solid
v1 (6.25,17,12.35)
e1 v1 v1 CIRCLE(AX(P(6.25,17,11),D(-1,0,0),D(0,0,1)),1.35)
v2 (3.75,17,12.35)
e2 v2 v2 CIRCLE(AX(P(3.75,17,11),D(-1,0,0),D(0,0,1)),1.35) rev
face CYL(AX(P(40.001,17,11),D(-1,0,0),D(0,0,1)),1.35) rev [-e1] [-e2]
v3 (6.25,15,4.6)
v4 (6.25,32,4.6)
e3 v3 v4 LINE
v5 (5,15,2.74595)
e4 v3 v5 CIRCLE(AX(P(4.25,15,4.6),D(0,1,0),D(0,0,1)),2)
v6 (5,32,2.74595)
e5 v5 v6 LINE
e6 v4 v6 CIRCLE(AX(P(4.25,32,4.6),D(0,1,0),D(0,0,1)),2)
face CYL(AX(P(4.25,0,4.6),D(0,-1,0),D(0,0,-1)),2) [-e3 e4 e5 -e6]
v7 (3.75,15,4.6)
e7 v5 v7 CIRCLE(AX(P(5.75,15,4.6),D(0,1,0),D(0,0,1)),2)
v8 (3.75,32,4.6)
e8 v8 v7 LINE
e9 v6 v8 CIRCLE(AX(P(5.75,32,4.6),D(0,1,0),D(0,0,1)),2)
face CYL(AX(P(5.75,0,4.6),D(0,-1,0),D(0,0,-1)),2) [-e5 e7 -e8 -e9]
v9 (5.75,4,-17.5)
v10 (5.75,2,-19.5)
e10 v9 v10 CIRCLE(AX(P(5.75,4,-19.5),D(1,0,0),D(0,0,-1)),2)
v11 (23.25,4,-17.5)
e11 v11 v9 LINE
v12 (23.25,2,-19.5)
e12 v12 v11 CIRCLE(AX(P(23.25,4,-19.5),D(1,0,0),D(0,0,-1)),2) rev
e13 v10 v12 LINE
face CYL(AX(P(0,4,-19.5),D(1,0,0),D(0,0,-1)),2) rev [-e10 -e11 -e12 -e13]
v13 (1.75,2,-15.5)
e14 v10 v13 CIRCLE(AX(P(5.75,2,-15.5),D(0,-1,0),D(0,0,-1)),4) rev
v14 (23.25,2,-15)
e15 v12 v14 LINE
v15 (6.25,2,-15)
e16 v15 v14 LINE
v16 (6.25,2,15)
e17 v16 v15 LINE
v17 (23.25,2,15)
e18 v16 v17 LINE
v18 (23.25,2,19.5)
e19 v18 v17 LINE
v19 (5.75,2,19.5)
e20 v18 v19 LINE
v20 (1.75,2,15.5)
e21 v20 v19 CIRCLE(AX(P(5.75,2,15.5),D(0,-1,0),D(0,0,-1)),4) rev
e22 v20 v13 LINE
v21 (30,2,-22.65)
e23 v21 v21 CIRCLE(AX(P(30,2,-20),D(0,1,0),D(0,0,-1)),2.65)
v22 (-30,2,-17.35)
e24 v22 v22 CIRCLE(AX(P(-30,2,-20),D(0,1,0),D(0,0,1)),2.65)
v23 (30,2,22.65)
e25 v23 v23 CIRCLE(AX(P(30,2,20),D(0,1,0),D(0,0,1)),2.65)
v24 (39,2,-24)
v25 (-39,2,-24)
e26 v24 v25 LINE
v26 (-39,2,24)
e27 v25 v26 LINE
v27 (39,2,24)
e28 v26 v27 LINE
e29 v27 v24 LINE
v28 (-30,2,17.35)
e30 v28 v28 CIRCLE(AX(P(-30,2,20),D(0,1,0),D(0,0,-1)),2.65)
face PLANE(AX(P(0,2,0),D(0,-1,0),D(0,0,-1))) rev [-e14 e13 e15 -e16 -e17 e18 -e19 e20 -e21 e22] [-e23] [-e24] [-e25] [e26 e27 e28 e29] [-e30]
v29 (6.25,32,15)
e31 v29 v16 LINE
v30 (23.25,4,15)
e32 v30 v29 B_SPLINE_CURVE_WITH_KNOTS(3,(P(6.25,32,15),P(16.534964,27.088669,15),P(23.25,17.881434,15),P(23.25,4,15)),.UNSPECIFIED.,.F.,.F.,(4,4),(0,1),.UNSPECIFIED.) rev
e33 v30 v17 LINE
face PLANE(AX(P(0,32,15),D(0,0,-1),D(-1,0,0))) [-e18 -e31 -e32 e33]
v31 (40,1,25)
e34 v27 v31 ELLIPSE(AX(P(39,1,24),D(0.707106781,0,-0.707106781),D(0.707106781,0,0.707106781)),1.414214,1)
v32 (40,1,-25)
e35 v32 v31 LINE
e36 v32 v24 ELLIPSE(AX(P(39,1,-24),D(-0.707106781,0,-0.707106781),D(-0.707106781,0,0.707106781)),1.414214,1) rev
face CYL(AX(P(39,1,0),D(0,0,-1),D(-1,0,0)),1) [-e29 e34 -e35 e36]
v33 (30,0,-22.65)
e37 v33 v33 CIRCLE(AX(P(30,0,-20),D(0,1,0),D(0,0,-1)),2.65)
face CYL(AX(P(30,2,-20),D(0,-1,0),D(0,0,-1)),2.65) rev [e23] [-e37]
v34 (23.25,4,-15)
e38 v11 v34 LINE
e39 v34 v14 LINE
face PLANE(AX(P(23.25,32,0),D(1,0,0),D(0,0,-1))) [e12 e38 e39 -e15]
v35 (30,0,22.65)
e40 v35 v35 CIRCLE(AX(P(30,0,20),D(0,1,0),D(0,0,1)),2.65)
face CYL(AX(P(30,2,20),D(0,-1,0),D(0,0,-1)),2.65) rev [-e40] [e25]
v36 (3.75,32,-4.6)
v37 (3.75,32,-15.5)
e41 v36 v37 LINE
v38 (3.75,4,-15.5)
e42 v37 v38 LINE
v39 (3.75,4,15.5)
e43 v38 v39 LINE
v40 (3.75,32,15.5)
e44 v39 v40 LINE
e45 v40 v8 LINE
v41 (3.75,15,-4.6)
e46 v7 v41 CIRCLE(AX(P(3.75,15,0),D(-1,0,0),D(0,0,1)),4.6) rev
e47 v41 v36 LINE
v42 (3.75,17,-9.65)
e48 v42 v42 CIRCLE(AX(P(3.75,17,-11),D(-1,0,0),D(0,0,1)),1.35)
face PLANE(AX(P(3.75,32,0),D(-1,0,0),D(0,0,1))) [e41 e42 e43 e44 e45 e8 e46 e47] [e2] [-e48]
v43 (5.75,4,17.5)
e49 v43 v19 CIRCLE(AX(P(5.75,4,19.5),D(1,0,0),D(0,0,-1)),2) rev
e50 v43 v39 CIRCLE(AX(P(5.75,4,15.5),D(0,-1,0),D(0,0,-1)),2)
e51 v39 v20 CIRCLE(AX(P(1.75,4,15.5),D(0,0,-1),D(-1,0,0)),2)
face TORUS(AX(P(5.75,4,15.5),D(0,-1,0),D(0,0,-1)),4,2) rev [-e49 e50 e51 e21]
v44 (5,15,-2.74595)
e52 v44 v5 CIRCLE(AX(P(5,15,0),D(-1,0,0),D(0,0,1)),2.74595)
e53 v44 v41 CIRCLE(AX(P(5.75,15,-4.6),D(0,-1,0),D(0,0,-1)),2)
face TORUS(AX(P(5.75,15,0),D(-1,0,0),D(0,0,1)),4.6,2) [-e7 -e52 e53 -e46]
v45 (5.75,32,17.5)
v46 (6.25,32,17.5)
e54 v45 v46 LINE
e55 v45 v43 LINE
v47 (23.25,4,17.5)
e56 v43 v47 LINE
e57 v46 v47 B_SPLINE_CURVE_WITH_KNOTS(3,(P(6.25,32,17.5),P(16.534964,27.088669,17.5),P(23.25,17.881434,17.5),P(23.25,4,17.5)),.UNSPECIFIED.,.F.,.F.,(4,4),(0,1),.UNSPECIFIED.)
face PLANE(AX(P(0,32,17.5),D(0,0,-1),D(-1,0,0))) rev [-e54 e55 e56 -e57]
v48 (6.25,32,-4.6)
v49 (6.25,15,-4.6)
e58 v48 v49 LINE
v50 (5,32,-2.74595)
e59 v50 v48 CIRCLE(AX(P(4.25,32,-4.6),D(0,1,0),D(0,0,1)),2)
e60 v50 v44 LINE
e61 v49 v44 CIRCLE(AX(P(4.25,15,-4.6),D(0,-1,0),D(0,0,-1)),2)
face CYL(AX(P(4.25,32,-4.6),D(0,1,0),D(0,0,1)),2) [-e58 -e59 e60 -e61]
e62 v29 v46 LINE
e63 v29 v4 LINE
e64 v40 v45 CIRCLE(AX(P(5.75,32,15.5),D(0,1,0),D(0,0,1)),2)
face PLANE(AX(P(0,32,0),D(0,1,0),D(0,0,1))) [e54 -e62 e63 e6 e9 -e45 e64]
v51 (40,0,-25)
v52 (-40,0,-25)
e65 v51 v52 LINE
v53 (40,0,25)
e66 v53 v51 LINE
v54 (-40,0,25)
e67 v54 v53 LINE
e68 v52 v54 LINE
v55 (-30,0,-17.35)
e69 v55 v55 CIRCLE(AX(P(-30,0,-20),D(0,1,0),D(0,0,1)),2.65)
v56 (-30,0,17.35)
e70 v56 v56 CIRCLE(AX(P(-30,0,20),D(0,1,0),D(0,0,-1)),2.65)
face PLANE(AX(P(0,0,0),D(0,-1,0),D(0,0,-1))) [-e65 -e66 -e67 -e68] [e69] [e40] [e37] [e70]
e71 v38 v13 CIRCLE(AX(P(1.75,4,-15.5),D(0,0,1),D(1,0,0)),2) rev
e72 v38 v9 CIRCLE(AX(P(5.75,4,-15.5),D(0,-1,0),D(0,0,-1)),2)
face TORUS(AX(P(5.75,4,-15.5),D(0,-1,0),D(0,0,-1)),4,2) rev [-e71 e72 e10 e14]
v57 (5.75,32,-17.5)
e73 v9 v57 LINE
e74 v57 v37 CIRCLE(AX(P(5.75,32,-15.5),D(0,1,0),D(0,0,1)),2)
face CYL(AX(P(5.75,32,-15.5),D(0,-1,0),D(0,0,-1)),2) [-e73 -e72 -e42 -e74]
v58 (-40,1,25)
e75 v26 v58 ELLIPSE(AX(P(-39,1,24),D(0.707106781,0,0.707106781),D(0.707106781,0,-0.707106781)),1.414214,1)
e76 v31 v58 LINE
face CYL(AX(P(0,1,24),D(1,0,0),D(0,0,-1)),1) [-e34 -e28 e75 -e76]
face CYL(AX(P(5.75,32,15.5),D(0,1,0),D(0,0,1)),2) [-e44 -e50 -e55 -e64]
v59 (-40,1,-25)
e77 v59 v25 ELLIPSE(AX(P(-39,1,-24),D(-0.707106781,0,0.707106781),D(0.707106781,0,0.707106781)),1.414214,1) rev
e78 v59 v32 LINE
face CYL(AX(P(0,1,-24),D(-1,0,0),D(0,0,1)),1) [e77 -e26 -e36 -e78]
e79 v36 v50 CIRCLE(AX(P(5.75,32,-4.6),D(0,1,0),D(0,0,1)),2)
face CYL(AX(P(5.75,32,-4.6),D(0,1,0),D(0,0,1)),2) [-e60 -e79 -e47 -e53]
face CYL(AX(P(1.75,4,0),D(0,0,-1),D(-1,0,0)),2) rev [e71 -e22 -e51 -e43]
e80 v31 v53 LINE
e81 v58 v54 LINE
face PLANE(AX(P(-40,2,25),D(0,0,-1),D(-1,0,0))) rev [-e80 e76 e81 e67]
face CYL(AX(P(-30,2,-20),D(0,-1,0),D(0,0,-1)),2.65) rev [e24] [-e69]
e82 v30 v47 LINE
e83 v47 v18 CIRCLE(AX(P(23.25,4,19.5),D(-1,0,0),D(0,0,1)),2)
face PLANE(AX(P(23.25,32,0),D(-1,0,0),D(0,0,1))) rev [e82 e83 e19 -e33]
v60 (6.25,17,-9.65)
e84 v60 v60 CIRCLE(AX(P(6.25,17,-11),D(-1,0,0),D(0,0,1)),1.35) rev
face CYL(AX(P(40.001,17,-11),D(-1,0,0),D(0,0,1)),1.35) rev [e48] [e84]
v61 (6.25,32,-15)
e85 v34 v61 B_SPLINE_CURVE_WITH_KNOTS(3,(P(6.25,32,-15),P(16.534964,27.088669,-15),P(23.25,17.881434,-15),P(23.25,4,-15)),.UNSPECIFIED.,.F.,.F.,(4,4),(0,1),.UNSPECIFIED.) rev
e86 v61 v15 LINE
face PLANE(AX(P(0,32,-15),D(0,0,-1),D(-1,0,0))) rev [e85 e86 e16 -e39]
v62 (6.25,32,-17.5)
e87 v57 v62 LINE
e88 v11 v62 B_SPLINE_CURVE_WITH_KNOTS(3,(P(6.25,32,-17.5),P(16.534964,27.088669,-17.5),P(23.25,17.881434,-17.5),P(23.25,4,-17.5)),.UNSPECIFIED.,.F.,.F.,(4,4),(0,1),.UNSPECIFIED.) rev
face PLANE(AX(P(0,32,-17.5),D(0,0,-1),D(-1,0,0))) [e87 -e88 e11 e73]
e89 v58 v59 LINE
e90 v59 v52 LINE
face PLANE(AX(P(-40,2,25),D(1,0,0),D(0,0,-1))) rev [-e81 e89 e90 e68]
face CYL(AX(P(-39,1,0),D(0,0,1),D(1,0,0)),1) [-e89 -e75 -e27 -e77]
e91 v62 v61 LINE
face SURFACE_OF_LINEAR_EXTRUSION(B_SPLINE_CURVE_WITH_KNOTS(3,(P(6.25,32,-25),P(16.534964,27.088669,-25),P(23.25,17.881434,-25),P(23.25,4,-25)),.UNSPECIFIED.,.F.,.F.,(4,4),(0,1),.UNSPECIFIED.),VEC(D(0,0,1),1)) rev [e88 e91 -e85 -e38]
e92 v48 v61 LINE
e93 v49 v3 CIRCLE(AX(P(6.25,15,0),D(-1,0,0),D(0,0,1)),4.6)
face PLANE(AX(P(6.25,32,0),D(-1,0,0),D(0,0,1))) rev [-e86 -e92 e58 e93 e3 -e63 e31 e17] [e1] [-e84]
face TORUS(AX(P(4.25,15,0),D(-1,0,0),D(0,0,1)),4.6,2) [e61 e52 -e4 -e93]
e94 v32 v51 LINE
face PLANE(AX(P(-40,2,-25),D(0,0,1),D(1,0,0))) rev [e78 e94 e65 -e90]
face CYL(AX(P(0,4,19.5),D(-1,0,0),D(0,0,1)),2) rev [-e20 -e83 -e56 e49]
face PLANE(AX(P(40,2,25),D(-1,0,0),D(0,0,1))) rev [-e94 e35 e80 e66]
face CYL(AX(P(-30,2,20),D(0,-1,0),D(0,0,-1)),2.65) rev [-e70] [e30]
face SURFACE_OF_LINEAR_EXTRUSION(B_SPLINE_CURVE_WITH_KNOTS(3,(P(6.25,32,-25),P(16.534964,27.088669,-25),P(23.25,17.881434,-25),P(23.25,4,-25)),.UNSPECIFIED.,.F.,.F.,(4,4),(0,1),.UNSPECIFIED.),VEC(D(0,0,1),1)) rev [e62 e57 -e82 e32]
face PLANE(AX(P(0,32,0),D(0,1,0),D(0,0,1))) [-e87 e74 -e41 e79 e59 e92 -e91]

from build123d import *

# Parameters (mm, degrees)
SKETCH_2_W          = 80
SKETCH_2_H          = 50
SKETCH_2_R          = 2.65
EXTRUDE_1_DEPTH     = 2
SKETCH_3_W          = 2.5
SKETCH_3_H          = 35
SKETCH_3_W_2        = 17
SKETCH_3_H_2        = 2.5
EXTRUDE_2_DEPTH     = 30
CUT_EXTRUDE_1_REACH = 61.691
SKETCH_4_R          = 1.35
SKETCH_4_W          = 5.2
SKETCH_4_H          = 17
FILLET_1_R          = 2
FILLET_2_R          = 1
CUT_EXTRUDE_2_DEPTH = 67.560123197


with BuildPart() as part:
    # 草图2 → 凸台-拉伸1 (new body)
    with BuildSketch(Plane(origin=(0, 0, 0), x_dir=(1, 0, 0), z_dir=(0, 1, 0))):
        Rectangle(SKETCH_2_W, SKETCH_2_H)
        with Locations(Location((-30, 20, 0), (0, 0, 270))):
            Circle(SKETCH_2_R, mode=Mode.SUBTRACT)
        with Locations(Location((30, 20, 0), (0, 0, 90))):
            Circle(SKETCH_2_R, mode=Mode.SUBTRACT)
        with Locations(Location((-30, -20, 0), (0, 0, 90))):
            Circle(SKETCH_2_R, mode=Mode.SUBTRACT)
        with Locations(Location((30, -20, 0), (0, 0, 270))):
            Circle(SKETCH_2_R, mode=Mode.SUBTRACT)
    extrude(amount=EXTRUDE_1_DEPTH)

    # 草图3 → 凸台-拉伸2 (add)
    with BuildSketch(Plane(origin=(0, 2, 0), x_dir=(1, 0, 0), z_dir=(0, 1, 0))):
        with Locations((5, 0)):
            Rectangle(SKETCH_3_W, SKETCH_3_H)
        with Locations((14.75, 16.25)):
            Rectangle(SKETCH_3_W_2, SKETCH_3_H_2)
        with Locations((14.75, -16.25)):
            Rectangle(SKETCH_3_W_2, SKETCH_3_H_2)
    extrude(amount=EXTRUDE_2_DEPTH)

    # 草图4 → 切除-拉伸1 (cut, up to next)
    with BuildSketch(Plane.ZY.offset(-3.75), mode=Mode.PRIVATE) as cut_extrude_1_sk1:
        with Locations((11, 17)):
            Circle(SKETCH_4_R)
    cut_extrude_1_tool1 = extrude(cut_extrude_1_sk1.sketch, amount=-CUT_EXTRUDE_1_REACH, mode=Mode.PRIVATE) & part.part
    # 草图4 → 切除-拉伸1 (cut, up to next)
    with BuildSketch(Plane.ZY.offset(-3.75), mode=Mode.PRIVATE) as cut_extrude_1_sk2:
        with Locations((-11, 17)):
            Circle(SKETCH_4_R)
    cut_extrude_1_tool2 = extrude(cut_extrude_1_sk2.sketch, amount=-CUT_EXTRUDE_1_REACH, mode=Mode.PRIVATE) & part.part
    # 草图4 → 切除-拉伸1 (cut, up to next)
    with BuildSketch(Plane.ZY.offset(-3.75), mode=Mode.PRIVATE) as cut_extrude_1_sk3:
        with Locations((0, 23.5)):
            Rectangle(SKETCH_4_W, SKETCH_4_H)
    cut_extrude_1_tool3 = extrude(cut_extrude_1_sk3.sketch, amount=-CUT_EXTRUDE_1_REACH, mode=Mode.PRIVATE) & part.part
    # 草图4 → 切除-拉伸1 (cut, up to next)
    with BuildSketch(Plane.ZY.offset(-3.75), mode=Mode.PRIVATE) as cut_extrude_1_sk4:
        with BuildLine():
            Line((-2.6, 15), (2.6, 15))
            ThreePointArc((2.6, 15), (0, 12.4), (-2.6, 15))
        make_face()
    cut_extrude_1_tool4 = extrude(cut_extrude_1_sk4.sketch, amount=-CUT_EXTRUDE_1_REACH, mode=Mode.PRIVATE) & part.part
    add(cut_extrude_1_tool1.solids().sort_by_distance((3.75, 17, 11))[0], mode=Mode.SUBTRACT)
    add(cut_extrude_1_tool2.solids().sort_by_distance((3.75, 17, -11))[0], mode=Mode.SUBTRACT)
    add(cut_extrude_1_tool3.solids().sort_by_distance((3.75, 23.5, 0))[0], mode=Mode.SUBTRACT)
    add(cut_extrude_1_tool4.solids().sort_by_distance((3.75, 13.896526, 0))[0], mode=Mode.SUBTRACT)

    # 圆角1
    # the kernel refuses this fillet: 2 mm, written as the material it takes off along each edge
    with BuildSketch(Plane(origin=(6.25, 37, 2.6), x_dir=(0, 0, 1), z_dir=(0, -1, 0)), Plane(origin=(6.25, 15, -2.6), x_dir=(0, 0, -1), z_dir=(0, 1, 0)), Plane(origin=(3.75, 37, -2.6), x_dir=(0, 0, -1), z_dir=(0, -1, 0)), Plane(origin=(3.75, 15, 2.6), x_dir=(0, 0, 1), z_dir=(0, 1, 0))) as fillet_1_piece_1:
        with BuildLine():
            CenterArc((FILLET_1_R, FILLET_1_R), FILLET_1_R, 180, 90)
            Line((0, FILLET_1_R), (0, 0))
            Line((0, 0), (FILLET_1_R, 0))
        make_face()
    extrude(amount=22, mode=Mode.SUBTRACT)
    with BuildSketch(Plane(origin=(6.25, 15, 0), x_dir=(0, 0, -1), z_dir=(0, 1, 0))) as fillet_1_piece_2:
        with BuildLine():
            CenterArc((2.6 + FILLET_1_R, FILLET_1_R), FILLET_1_R, 180, 90)
            Line((2.6, FILLET_1_R), (2.6, 0))
            Line((2.6, 0), (2.6 + FILLET_1_R, 0))
        make_face()
    revolve(axis=Axis((6.25, 15, 0), (-1, 0, 0)), revolution_arc=180, mode=Mode.SUBTRACT)
    with BuildSketch(Plane(origin=(3.75, 15, 0), x_dir=(0, 0, 1), z_dir=(0, 1, 0))) as fillet_1_piece_3:
        with BuildLine():
            CenterArc((2.6 + FILLET_1_R, FILLET_1_R), FILLET_1_R, 180, 90)
            Line((2.6, FILLET_1_R), (2.6, 0))
            Line((2.6, 0), (2.6 + FILLET_1_R, 0))
        make_face()
    revolve(axis=Axis((3.75, 15, 0), (1, 0, 0)), revolution_arc=180, mode=Mode.SUBTRACT)
    with BuildSketch(Plane(origin=(3.75, 2, -17.5), x_dir=(1, 0, 0), z_dir=(0, 1, 0))) as fillet_1_piece_4:
        with BuildLine():
            CenterArc((FILLET_1_R, -FILLET_1_R), FILLET_1_R, 90, 90)
            Line((0, -FILLET_1_R), (0, 0))
            Line((0, 0), (FILLET_1_R, 0))
        make_face()
    extrude(amount=35, mode=Mode.SUBTRACT)
    with BuildSketch(Plane(origin=(3.75, 2, 17.5), x_dir=(1, 0, 0), z_dir=(0, 1, 0))) as fillet_1_piece_5:
        with BuildLine():
            CenterArc((FILLET_1_R, FILLET_1_R), FILLET_1_R, 180, 90)
            Line((0, FILLET_1_R), (0, 0))
            Line((0, 0), (FILLET_1_R, 0))
        make_face()
    extrude(amount=35, mode=Mode.SUBTRACT)
    # the kernel refuses this fillet: 2 mm, written as the material it adds along each edge
    with BuildSketch(Plane(origin=(5.75, 2, 17.5), x_dir=(0, 0, 1), z_dir=(1, 0, 0))) as fillet_1_2_piece_1:
        with BuildLine():
            CenterArc((FILLET_1_R, -FILLET_1_R), FILLET_1_R, 90, 90)
            Line((0, -FILLET_1_R), (0, 0))
            Line((0, 0), (FILLET_1_R, 0))
        make_face()
    extrude(amount=17.5)
    with BuildSketch(Plane(origin=(5.75, 2, -17.5), x_dir=(0, 0, -1), z_dir=(1, 0, 0))) as fillet_1_2_piece_2:
        with BuildLine():
            CenterArc((FILLET_1_R, FILLET_1_R), FILLET_1_R, 180, 90)
            Line((0, FILLET_1_R), (0, 0))
            Line((0, 0), (FILLET_1_R, 0))
        make_face()
    extrude(amount=17.5)
    with BuildSketch(Plane(origin=(3.75, 2, -15.5), x_dir=(-1, 0, 0), z_dir=(0, 0, 1))) as fillet_1_2_piece_3:
        with BuildLine():
            CenterArc((FILLET_1_R, -FILLET_1_R), FILLET_1_R, 90, 90)
            Line((0, -FILLET_1_R), (0, 0))
            Line((0, 0), (FILLET_1_R, 0))
        make_face()
    extrude(amount=31)
    with BuildSketch(Plane(origin=(5.75, 2, -15.5), x_dir=(0, 0, -1), z_dir=(1, 0, 0))) as fillet_1_2_piece_4:
        with BuildLine():
            CenterArc((2 + FILLET_1_R, FILLET_1_R), FILLET_1_R, 180, 90)
            Line((2, FILLET_1_R), (2, 0))
            Line((2, 0), (2 + FILLET_1_R, 0))
        make_face()
    revolve(axis=Axis((5.75, 2, -15.5), (0, 1, 0)), revolution_arc=90)
    with BuildSketch(Plane(origin=(5.75, 2, 15.5), x_dir=(0, 0, 1), z_dir=(1, 0, 0))) as fillet_1_2_piece_5:
        with BuildLine():
            CenterArc((2 + FILLET_1_R, -FILLET_1_R), FILLET_1_R, 90, 90)
            Line((2, -FILLET_1_R), (2, 0))
            Line((2, 0), (2 + FILLET_1_R, 0))
        make_face()
    revolve(axis=Axis((5.75, 2, 15.5), (0, -1, 0)), revolution_arc=90)

    # 圆角2
    fillet_2_edges = [part.edges().sort_by_distance(p)[0] for p in [
        (-40, 2, 0),
        (0, 2, 25),
        (40, 2, 0),
        (0, 2, -25),
    ]]
    fillet(fillet_2_edges, radius=FILLET_2_R)

    # 草图5 → 切除-拉伸2 (cut, through all)
    with BuildSketch(Plane.XY.offset(17.5)):
        with BuildLine():
            Line((23.25, 32), (6.25, 32))
            add(Edge.make_bspline(
                [(6.25, 32), (16.534964458, 27.088669385), (23.25, 17.881434401), (23.25, 4)],
                knots=[0, 0, 0, 0, 1, 1, 1, 1], degree=3))
            Line((23.25, 4), (23.25, 32))
        make_face()
    extrude(amount=-CUT_EXTRUDE_2_DEPTH, mode=Mode.SUBTRACT)


solid = part.part
